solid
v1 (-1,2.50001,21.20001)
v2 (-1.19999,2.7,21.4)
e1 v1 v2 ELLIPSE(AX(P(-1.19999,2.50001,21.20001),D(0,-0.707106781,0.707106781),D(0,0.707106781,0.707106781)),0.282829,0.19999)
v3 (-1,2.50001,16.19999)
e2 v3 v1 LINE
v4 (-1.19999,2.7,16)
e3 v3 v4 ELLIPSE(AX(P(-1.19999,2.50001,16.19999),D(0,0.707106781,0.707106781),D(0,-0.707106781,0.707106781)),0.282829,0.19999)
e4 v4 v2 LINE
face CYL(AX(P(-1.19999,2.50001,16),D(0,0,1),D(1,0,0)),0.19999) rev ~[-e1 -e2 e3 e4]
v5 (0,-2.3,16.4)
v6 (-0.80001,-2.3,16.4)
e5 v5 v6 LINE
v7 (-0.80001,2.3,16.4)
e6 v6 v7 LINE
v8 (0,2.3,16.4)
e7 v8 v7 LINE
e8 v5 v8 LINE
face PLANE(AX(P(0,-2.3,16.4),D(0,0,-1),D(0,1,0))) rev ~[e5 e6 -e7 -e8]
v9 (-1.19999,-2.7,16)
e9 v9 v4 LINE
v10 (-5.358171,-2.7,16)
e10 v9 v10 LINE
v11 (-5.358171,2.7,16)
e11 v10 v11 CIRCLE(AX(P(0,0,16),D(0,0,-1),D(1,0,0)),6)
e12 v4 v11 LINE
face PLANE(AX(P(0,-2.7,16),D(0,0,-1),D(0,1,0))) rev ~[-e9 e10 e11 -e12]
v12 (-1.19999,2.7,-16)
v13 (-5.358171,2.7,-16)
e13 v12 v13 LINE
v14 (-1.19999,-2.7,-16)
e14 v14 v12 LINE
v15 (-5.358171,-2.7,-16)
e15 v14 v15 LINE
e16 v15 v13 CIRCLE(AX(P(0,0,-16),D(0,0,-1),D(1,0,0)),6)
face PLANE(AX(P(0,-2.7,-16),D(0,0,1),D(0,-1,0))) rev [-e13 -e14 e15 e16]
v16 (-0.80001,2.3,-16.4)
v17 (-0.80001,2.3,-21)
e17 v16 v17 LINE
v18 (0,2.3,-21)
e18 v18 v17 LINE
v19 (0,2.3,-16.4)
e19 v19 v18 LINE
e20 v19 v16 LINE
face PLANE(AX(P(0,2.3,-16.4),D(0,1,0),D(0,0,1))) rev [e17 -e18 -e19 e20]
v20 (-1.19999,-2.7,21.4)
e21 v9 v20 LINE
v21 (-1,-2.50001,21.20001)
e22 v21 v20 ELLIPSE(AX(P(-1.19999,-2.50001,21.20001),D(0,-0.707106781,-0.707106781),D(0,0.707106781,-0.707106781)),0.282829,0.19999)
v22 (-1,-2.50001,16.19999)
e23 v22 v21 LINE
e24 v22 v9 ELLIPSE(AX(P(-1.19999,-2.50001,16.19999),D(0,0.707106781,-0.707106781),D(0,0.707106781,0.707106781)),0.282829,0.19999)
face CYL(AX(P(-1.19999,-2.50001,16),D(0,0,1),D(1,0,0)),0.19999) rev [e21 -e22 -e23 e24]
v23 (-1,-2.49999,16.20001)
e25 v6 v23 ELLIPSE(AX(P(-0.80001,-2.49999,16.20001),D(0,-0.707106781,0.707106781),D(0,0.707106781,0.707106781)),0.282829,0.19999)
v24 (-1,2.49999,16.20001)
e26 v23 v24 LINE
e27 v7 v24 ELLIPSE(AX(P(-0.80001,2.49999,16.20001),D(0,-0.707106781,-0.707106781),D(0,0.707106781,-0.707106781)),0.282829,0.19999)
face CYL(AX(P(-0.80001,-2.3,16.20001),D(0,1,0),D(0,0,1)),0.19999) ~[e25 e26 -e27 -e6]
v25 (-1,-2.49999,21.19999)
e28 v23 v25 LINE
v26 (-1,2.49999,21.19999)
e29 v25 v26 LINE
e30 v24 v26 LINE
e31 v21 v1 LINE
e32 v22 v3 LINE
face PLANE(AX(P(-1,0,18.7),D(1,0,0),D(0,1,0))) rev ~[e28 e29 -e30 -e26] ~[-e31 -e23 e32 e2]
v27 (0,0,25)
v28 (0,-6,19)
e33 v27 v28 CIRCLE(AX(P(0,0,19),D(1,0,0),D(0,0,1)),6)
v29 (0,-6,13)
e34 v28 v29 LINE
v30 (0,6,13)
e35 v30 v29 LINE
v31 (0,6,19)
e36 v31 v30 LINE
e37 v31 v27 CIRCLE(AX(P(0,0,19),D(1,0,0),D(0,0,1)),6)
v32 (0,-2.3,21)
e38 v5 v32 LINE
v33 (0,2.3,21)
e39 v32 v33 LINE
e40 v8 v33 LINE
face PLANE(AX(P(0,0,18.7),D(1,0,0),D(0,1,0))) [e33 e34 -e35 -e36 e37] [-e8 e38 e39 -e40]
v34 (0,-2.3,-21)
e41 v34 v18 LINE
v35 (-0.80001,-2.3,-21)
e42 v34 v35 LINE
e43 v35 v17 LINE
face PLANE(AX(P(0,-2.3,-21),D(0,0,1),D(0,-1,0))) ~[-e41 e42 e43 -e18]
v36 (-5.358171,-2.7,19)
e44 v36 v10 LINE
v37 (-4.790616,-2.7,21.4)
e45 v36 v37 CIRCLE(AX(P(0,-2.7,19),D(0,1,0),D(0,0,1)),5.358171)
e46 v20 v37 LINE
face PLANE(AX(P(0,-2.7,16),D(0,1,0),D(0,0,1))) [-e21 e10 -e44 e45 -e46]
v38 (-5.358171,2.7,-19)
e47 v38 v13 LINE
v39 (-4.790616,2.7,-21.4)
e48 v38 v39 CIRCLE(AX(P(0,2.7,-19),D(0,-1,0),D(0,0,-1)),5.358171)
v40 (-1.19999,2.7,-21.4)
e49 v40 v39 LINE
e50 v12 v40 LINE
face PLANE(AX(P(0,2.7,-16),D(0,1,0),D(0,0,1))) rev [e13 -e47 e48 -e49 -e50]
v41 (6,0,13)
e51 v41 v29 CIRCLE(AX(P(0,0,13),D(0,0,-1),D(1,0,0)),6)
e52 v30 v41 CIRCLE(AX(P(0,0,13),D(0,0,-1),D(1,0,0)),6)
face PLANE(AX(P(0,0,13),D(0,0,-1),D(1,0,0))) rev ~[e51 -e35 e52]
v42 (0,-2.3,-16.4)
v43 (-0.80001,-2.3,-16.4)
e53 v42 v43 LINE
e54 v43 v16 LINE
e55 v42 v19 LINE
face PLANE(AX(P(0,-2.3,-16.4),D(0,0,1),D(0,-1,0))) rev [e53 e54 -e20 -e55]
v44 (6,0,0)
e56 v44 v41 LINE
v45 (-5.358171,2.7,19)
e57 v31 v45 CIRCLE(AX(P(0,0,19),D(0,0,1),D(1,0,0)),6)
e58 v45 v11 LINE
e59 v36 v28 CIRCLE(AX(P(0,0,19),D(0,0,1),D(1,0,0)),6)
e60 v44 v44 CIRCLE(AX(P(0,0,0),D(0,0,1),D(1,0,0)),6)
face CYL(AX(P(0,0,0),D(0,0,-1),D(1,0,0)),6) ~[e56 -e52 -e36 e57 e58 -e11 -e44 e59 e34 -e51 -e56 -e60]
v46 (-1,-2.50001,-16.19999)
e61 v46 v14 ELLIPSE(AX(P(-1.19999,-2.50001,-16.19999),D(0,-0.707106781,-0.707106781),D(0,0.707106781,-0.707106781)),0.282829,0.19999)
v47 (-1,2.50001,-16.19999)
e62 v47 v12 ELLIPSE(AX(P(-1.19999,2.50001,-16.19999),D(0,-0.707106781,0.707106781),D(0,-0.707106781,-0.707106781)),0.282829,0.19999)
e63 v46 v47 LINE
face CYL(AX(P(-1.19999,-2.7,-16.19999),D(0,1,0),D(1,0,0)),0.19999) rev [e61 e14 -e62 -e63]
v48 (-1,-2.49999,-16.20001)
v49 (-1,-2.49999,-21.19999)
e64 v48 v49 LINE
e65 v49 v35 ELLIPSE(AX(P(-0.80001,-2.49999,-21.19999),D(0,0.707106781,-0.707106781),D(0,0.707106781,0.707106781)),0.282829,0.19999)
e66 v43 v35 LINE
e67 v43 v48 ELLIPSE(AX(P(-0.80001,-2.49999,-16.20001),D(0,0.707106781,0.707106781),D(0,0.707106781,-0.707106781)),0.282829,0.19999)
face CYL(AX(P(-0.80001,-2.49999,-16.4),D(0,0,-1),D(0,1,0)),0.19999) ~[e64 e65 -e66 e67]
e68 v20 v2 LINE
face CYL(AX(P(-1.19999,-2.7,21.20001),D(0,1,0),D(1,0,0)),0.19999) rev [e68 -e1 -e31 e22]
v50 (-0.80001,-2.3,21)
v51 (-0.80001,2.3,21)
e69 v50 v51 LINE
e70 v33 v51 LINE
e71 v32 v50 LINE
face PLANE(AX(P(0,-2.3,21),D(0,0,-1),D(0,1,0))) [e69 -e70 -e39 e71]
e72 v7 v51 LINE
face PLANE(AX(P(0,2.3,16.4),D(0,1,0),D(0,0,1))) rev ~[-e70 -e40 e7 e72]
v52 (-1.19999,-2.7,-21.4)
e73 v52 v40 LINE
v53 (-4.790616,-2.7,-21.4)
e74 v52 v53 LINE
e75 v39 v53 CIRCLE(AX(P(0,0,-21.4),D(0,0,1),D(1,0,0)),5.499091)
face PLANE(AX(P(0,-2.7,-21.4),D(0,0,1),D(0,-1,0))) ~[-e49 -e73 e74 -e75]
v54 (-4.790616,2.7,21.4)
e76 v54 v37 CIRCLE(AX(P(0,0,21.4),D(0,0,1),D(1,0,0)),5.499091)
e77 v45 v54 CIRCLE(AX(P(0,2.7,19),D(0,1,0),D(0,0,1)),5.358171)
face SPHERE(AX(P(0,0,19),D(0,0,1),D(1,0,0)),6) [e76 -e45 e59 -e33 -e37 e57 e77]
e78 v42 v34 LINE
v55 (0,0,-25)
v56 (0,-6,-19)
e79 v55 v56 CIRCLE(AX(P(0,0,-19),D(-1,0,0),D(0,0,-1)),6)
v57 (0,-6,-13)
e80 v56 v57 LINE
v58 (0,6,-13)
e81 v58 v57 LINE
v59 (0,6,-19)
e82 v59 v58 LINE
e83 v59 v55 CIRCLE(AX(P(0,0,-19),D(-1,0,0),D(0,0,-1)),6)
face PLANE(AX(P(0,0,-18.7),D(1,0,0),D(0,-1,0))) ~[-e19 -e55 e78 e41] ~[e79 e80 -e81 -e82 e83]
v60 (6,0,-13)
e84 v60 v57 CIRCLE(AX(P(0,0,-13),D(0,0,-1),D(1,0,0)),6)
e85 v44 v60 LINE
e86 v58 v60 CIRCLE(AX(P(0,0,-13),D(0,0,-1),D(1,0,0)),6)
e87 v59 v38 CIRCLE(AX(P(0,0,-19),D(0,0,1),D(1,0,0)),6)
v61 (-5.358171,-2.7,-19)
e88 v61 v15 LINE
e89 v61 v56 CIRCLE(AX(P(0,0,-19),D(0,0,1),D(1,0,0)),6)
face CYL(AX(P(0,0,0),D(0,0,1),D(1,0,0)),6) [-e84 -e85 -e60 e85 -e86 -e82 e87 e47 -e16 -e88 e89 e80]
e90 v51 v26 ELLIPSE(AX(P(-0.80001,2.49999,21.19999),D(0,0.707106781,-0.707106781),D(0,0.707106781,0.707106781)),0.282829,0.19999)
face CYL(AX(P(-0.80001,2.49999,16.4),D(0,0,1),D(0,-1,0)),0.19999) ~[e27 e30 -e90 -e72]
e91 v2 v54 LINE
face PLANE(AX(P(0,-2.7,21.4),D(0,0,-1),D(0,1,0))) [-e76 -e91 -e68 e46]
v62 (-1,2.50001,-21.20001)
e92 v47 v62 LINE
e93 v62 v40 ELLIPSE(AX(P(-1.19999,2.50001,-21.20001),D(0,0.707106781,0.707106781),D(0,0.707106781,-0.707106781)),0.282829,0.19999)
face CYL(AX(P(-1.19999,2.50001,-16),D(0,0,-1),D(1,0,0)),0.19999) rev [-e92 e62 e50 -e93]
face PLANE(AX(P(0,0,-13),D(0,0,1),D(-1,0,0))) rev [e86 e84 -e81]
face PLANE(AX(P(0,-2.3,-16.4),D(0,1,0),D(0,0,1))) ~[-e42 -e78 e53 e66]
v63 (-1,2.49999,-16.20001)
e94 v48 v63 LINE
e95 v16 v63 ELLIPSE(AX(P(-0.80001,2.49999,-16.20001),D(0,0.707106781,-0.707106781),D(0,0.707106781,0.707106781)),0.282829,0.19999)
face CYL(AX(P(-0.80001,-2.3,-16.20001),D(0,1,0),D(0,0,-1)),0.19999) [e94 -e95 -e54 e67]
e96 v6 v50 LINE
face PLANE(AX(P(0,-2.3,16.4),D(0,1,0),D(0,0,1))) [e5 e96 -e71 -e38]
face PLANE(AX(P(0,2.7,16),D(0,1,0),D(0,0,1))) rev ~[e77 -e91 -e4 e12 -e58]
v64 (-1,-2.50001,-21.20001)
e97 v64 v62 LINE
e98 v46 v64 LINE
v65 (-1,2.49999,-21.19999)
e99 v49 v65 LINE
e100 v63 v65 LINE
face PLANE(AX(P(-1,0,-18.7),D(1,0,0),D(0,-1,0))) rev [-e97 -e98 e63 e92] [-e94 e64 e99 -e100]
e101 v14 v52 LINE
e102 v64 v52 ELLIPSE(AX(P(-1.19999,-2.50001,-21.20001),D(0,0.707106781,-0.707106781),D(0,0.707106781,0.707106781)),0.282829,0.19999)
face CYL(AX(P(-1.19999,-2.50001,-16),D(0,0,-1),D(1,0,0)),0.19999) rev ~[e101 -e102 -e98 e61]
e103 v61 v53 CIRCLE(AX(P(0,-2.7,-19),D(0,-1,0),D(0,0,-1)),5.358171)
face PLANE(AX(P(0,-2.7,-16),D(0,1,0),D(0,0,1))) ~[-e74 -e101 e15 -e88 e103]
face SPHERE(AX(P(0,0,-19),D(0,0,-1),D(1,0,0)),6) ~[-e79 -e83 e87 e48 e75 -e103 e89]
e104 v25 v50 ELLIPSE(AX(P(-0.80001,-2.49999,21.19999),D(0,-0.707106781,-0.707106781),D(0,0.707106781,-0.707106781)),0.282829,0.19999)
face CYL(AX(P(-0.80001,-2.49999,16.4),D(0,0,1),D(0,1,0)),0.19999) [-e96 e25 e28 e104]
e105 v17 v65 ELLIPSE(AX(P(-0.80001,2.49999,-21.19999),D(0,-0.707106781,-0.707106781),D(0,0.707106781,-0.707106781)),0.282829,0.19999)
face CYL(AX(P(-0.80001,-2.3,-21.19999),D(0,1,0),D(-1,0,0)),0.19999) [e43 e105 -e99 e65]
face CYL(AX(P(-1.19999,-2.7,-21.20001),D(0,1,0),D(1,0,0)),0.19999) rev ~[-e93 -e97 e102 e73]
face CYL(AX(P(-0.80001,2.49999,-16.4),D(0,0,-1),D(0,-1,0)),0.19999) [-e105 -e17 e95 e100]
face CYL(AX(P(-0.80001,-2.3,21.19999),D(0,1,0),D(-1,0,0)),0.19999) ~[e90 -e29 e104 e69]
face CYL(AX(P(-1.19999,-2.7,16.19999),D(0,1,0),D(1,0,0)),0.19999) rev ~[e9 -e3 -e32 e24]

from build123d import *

# Parameters (mm, degrees)
F0_R     = 6
F1_DEPTH = 25
F2_R     = 6
F3_W     = 7.4530789975
F3_H     = 13.9023570546
F4_DEPTH = 12.5
F5_W     = 5.4
F5_H     = 5.4
F6_DEPTH = 25
F7_W     = 5.4
F7_H     = 5.4
F7_W_2   = 4.6
F7_H_2   = 4.6
F8_DEPTH = 1
F9_R     = 0.19999


# Not quite as in the source:
# - a fillet or chamfer is up to 0.001 mm smaller than in the source, because OpenCascade refuses the exact size


with BuildPart() as f1:
    # F0 (on Top) → F1 (new body)
    with BuildSketch(Plane.XY):
        Circle(F0_R)
    extrude(amount=F1_DEPTH)

    # F2
    f2_edges = [f1.edges().sort_by_distance(p)[0] for p in [
        (-6, 0, 25),
    ]]
    fillet(f2_edges, radius=F2_R)

    # F3 (on Front) → F4 (cut, symmetric)
    with BuildSketch(Plane.XZ):
        with Locations((3.7265394987, 19.9511785273)):
            Rectangle(F3_W, F3_H)
    extrude(amount=F4_DEPTH, both=True, mode=Mode.SUBTRACT)

    # F5 (on face) → F6 (cut)
    with BuildSketch(Plane.YZ):
        with Locations((0, 18.7)):
            Rectangle(F5_W, F5_H)
    extrude(amount=-F6_DEPTH, mode=Mode.SUBTRACT)

    # F7 (on face) → F8 (join)
    with BuildSketch(Plane.YZ):
        with Locations((0, 18.7)):
            Rectangle(F7_W, F7_H)
        with Locations((0, 18.7)):
            Rectangle(F7_W_2, F7_H_2, mode=Mode.SUBTRACT)
    extrude(amount=-F8_DEPTH)

    # F9 (radius 0.2 in the source; OpenCascade refuses exactly that, so slightly less here)
    f9_edges = [f1.edges().sort_by_distance(p)[0] for p in [
        (-1, 0, 16.4),
        (-1, 2.3, 18.7),
        (-1, 0, 21),
        (-1, -2.3, 18.7),
        (-1, 0, 21.4),
        (-1, -2.7, 18.7),
        (-1, 2.7, 18.7),
        (-1, 0, 16),
    ]]
    fillet(f9_edges, radius=F9_R)

    # F10: F1 across plane


with BuildPart() as f1_1:
    add(f1.part)
    add(f1.part.mirror(Plane.XY))


solid = f1_1.part
